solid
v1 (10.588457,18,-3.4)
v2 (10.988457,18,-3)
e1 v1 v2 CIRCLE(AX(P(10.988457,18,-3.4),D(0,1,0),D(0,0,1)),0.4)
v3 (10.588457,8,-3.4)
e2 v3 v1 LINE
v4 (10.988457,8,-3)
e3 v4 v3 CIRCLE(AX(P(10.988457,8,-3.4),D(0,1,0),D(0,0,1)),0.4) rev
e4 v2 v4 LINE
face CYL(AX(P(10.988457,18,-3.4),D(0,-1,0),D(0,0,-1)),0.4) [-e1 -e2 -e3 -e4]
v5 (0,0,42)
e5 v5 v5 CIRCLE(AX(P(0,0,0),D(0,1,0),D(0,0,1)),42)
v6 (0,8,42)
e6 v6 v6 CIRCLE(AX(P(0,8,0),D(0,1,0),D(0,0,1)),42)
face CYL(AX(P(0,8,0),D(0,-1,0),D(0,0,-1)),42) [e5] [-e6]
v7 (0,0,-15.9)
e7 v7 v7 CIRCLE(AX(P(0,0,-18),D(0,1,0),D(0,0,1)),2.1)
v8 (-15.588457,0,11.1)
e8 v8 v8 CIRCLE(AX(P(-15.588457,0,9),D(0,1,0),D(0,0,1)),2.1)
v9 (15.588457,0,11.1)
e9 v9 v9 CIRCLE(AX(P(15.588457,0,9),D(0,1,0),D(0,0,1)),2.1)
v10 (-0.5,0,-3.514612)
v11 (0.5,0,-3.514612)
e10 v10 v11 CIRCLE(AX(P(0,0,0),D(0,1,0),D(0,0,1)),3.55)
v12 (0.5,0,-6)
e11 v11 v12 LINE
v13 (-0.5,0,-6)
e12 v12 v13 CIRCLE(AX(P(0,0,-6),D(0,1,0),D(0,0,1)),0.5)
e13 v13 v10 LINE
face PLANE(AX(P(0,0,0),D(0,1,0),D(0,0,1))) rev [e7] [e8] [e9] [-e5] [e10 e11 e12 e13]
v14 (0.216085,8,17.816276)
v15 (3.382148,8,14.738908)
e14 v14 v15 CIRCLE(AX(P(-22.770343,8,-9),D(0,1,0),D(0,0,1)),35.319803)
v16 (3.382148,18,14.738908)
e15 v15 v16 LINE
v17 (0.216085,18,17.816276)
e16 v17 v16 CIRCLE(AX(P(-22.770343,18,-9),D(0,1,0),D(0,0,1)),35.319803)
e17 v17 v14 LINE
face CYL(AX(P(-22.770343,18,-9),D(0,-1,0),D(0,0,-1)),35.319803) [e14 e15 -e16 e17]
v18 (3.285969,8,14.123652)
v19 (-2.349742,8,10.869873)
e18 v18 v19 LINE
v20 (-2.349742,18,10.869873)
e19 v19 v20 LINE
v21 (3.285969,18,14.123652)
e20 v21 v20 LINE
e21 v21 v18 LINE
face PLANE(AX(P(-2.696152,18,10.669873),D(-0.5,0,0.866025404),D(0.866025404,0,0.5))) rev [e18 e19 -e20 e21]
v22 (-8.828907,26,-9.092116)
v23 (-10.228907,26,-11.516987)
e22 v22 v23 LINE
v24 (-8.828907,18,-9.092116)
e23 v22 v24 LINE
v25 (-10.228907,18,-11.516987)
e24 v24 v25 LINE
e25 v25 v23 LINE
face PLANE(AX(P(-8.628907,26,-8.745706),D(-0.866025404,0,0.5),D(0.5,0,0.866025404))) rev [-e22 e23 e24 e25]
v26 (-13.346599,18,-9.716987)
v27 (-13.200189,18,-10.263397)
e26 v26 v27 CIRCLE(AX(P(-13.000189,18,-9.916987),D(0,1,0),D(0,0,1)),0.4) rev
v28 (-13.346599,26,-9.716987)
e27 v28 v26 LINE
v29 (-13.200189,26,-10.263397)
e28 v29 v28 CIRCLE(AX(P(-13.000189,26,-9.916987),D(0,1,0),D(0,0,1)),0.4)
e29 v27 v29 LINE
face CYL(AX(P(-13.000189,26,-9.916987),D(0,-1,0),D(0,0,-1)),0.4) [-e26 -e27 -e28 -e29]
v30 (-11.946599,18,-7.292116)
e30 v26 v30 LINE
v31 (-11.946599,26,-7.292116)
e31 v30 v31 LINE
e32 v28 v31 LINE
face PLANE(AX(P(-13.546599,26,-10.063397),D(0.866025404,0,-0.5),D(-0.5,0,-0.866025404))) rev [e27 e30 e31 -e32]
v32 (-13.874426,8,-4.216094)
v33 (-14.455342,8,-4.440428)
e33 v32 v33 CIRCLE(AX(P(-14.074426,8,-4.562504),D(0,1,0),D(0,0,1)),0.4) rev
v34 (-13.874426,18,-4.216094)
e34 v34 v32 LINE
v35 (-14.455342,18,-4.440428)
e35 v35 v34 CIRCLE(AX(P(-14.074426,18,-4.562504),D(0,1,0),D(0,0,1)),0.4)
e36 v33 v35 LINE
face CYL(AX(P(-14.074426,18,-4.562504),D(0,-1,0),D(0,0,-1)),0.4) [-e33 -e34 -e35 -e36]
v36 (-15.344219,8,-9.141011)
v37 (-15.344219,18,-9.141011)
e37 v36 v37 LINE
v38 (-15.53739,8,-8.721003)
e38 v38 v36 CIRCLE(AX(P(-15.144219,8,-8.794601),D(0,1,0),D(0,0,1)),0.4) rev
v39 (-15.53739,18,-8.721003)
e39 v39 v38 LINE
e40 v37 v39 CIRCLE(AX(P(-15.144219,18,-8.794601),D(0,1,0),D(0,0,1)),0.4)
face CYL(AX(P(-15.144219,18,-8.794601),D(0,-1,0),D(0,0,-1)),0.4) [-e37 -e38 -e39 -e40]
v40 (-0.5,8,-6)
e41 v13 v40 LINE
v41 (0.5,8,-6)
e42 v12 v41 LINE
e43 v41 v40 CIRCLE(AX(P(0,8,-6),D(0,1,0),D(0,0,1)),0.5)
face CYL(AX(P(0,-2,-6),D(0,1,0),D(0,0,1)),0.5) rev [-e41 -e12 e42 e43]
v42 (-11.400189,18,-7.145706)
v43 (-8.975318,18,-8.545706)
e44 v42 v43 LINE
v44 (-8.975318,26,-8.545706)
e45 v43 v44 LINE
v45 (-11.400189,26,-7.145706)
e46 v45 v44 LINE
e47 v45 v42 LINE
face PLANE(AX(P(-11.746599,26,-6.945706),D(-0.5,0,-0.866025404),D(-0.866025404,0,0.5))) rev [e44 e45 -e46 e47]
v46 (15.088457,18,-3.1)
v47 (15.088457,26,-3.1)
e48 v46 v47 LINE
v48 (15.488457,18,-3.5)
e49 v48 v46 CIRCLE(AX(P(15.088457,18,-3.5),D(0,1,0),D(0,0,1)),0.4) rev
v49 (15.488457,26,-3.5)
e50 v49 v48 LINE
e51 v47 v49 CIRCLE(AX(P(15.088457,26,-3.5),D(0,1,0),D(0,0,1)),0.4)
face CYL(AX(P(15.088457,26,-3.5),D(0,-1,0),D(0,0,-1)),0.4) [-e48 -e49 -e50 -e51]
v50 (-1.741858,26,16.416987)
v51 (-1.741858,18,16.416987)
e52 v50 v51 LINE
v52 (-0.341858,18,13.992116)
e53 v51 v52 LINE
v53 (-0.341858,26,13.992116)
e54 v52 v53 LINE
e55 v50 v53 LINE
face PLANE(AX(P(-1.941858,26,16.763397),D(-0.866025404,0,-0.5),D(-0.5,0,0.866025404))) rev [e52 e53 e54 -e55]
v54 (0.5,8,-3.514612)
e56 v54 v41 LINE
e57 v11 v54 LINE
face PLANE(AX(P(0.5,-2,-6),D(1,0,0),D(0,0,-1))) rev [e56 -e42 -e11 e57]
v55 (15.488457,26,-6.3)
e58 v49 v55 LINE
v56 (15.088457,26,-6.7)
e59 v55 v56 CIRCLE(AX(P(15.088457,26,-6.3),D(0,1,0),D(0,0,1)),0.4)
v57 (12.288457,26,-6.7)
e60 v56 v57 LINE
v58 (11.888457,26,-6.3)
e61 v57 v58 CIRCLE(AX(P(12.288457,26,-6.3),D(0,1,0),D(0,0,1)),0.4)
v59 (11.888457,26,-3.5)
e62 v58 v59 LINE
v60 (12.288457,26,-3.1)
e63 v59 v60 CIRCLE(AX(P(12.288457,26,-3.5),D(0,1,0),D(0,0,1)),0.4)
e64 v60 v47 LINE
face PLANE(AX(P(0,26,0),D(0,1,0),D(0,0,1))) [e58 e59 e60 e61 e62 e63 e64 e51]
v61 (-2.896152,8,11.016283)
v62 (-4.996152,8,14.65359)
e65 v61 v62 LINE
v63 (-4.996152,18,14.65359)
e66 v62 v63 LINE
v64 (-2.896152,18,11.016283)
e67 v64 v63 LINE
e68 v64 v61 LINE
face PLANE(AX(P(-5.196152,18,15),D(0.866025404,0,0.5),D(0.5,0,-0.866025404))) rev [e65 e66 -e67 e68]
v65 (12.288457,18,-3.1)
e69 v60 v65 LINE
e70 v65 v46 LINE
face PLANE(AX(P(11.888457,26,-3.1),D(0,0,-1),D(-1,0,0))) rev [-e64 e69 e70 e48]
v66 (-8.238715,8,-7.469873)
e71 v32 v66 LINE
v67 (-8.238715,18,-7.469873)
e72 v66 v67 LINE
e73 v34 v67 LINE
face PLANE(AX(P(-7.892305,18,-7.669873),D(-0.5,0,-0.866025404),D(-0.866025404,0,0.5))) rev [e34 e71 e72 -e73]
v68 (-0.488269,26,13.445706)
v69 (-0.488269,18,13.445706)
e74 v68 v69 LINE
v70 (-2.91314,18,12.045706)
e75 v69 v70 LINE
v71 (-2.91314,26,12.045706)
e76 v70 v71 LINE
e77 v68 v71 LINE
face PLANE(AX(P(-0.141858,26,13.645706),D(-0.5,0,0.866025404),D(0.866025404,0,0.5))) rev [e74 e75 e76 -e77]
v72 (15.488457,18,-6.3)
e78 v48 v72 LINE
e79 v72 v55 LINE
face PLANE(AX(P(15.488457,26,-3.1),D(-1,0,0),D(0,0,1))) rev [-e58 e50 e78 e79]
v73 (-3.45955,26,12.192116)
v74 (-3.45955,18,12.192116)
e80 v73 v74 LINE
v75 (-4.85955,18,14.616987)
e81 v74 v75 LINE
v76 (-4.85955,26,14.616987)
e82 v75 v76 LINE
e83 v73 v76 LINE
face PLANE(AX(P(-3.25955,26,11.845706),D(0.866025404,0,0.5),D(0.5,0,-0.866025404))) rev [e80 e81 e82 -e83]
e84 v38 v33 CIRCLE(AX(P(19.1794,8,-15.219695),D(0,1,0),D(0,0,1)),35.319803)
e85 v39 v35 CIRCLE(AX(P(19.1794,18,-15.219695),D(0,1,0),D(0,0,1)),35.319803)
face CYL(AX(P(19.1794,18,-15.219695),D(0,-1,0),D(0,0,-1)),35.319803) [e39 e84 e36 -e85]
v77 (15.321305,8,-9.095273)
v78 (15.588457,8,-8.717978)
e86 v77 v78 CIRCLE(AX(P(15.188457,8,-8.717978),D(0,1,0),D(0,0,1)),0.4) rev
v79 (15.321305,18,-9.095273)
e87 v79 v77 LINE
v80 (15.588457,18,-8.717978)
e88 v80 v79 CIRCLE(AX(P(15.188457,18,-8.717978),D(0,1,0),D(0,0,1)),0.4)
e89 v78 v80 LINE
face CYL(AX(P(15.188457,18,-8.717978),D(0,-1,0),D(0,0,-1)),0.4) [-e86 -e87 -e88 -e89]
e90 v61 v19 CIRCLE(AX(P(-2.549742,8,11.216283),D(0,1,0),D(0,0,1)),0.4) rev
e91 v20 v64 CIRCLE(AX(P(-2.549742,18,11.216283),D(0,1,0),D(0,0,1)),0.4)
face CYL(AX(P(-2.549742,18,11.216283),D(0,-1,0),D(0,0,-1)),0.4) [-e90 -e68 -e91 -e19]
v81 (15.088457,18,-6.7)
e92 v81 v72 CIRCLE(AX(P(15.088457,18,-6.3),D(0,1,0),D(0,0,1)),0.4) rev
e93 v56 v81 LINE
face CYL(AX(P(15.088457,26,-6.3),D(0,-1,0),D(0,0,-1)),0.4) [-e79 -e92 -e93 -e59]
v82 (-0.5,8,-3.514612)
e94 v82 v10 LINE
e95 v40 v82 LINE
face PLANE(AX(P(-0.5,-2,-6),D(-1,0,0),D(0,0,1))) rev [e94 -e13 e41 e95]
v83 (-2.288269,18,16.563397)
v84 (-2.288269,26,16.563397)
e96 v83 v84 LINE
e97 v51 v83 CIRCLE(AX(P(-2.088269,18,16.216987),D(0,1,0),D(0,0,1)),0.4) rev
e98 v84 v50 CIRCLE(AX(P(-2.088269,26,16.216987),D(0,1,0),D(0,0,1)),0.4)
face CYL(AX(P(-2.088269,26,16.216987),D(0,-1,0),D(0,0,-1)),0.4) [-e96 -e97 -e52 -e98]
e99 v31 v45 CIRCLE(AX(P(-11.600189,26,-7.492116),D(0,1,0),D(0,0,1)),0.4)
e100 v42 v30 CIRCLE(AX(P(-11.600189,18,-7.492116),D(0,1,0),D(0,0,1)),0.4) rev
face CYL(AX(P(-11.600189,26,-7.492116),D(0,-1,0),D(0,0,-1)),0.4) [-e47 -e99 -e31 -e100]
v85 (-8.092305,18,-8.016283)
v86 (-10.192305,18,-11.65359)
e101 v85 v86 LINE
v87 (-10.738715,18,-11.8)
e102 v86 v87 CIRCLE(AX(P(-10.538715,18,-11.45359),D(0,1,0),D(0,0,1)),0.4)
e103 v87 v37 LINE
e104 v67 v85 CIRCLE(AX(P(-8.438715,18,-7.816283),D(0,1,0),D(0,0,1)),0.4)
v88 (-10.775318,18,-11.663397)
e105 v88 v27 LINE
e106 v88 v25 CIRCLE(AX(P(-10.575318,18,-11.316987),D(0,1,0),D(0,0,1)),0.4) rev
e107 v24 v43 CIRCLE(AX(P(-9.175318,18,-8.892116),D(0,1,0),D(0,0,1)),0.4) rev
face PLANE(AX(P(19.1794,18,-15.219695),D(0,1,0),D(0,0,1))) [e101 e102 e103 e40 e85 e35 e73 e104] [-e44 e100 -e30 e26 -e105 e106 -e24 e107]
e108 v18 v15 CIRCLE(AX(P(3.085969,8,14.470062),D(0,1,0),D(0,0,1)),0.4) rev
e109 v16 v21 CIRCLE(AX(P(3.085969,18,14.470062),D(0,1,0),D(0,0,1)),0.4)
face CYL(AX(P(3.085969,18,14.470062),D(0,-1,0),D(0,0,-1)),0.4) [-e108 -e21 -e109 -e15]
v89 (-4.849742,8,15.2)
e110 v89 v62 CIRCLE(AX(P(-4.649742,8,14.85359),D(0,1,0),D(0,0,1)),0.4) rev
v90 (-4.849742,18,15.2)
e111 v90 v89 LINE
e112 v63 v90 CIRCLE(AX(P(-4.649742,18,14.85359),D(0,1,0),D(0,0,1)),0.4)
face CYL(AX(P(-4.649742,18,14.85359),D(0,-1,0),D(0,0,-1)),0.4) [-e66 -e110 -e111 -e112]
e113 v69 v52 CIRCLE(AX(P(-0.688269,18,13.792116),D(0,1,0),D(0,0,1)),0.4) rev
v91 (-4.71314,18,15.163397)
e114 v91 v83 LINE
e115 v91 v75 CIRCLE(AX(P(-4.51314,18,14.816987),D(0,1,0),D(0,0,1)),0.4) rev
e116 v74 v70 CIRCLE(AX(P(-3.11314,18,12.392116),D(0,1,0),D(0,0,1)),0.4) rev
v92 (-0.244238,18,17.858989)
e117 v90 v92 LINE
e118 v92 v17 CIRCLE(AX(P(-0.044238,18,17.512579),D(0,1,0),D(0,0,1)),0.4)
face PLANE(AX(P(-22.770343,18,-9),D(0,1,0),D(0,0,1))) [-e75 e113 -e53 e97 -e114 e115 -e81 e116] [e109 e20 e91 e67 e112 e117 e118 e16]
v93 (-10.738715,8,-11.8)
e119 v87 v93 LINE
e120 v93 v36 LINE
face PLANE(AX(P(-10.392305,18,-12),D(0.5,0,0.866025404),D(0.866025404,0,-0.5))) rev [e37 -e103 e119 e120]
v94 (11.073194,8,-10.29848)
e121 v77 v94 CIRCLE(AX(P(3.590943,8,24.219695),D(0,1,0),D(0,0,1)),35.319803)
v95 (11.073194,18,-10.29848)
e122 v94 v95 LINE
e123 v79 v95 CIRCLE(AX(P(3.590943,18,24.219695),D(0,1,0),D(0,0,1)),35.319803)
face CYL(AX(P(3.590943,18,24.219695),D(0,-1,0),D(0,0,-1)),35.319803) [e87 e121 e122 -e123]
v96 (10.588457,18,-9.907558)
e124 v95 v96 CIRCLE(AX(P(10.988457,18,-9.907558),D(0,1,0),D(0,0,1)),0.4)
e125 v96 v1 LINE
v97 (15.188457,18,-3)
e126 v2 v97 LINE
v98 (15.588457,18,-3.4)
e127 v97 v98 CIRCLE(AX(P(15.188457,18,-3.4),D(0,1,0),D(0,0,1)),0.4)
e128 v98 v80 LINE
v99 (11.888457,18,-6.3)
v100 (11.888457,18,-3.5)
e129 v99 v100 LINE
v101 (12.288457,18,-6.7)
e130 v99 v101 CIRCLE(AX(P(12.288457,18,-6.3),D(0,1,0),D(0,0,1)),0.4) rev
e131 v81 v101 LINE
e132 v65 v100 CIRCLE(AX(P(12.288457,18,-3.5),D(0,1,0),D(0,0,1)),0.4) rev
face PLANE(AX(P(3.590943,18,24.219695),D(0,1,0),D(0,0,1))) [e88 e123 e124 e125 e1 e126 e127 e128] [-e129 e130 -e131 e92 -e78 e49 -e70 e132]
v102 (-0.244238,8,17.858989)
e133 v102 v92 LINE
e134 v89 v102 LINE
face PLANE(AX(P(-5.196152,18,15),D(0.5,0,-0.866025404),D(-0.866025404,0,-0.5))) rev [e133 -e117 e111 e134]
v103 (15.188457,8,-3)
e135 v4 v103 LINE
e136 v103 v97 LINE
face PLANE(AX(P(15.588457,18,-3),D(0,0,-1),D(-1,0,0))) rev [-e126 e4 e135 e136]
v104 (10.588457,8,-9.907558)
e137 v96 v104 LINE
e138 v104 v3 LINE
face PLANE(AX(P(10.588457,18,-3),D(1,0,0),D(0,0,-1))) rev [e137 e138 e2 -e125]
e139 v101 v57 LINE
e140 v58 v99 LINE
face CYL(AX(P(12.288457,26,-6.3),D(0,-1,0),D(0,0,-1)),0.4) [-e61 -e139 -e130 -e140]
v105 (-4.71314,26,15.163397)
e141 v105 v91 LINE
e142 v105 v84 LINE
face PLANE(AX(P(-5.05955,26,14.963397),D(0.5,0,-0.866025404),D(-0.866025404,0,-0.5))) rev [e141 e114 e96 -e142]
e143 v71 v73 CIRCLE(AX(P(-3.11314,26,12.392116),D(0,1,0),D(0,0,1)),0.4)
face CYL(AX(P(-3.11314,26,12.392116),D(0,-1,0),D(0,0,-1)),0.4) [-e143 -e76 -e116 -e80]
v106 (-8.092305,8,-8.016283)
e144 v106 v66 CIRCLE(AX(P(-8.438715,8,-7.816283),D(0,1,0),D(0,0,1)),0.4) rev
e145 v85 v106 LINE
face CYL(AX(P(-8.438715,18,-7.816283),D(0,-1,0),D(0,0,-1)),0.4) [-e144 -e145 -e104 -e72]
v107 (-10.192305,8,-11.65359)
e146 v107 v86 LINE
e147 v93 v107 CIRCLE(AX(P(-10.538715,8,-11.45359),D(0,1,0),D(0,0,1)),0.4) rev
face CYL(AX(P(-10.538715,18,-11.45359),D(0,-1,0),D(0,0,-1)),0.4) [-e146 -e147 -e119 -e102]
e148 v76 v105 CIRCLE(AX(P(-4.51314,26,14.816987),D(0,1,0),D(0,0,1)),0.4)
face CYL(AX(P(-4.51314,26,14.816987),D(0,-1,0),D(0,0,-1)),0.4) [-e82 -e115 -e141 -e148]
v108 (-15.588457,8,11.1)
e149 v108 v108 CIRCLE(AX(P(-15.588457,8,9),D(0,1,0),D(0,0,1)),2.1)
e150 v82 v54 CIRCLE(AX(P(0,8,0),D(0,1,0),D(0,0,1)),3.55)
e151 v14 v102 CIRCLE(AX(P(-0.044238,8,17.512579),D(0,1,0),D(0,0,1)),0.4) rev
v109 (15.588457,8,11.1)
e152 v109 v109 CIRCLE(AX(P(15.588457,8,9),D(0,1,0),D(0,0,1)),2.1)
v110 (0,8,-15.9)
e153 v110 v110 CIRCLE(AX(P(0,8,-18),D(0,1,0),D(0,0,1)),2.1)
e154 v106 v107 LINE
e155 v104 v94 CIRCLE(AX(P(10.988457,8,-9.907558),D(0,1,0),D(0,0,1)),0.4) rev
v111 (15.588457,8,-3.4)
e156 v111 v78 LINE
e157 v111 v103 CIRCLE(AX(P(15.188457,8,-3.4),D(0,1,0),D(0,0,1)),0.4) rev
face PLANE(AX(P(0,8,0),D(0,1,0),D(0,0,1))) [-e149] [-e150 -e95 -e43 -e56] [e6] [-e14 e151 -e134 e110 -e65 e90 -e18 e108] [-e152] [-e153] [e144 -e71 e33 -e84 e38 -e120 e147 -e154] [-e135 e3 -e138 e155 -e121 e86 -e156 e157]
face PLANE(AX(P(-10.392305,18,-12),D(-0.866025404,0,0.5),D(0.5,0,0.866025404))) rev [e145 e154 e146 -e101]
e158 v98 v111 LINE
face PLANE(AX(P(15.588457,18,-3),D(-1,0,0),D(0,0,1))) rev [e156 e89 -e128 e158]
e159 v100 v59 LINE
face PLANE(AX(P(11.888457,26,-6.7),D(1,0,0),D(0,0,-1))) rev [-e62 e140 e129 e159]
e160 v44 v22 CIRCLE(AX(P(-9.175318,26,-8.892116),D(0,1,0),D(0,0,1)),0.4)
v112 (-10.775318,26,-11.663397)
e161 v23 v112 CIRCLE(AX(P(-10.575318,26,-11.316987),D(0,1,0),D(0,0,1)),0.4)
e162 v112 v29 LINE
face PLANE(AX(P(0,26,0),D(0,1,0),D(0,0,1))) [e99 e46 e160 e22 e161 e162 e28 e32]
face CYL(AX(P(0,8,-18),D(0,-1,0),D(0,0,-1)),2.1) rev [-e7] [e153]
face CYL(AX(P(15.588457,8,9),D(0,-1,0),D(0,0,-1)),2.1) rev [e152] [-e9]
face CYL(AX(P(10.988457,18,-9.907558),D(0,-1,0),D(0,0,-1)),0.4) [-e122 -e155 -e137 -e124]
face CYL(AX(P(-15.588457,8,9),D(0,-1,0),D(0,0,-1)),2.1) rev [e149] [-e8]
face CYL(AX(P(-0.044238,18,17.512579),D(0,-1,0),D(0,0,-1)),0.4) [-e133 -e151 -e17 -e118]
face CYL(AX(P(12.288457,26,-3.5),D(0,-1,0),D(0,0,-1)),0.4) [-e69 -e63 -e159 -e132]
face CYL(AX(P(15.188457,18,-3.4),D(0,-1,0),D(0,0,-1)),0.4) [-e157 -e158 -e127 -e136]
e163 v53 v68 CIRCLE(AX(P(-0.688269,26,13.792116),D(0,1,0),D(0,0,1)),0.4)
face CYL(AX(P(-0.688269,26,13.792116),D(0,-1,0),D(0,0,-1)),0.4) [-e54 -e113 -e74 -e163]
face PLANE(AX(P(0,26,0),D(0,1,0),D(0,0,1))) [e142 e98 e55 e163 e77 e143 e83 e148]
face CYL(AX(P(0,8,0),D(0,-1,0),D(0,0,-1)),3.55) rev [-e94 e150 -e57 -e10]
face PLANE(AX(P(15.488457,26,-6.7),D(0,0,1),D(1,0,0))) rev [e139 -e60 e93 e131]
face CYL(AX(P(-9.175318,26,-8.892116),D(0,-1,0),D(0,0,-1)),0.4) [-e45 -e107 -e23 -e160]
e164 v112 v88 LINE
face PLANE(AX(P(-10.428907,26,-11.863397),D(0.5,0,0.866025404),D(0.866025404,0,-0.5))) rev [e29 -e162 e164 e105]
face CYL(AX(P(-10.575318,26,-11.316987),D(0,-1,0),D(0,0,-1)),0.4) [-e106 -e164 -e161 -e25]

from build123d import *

# Parameters (mm, degrees)
BOSS_EXTRUDE1_OUTLINE_R   = 42
BOSS_EXTRUDE1_OUTLINE_R_2 = 2.1
BOSS_EXTRUDE1_OUTLINE_R_3 = 3.55
BOSS_EXTRUDE1_DEPTH       = 8
CUT_EXTRUDE2_DEPTH        = 10
BOSS_EXTRUDE5_DEPTH       = 10
SKETCH9_W                 = 3.6
SKETCH9_H                 = 3.6
BOSS_EXTRUDE6_DEPTH       = 8
FILLET1_R                 = 0.4


# Read off the part's stored shape, not the designer's step: Boss-Extrude1
with BuildPart() as part:
    # Boss-Extrude1 outline → Boss-Extrude1 (new body)
    with BuildSketch(Plane(origin=(0, 0, 0), x_dir=(1, 0, 0), z_dir=(0, 1, 0))):
        Circle(BOSS_EXTRUDE1_OUTLINE_R)
        with Locations((-15.588457268, -9)):
            Circle(BOSS_EXTRUDE1_OUTLINE_R_2, mode=Mode.SUBTRACT)
        with Locations((15.588457268, -9)):
            Circle(BOSS_EXTRUDE1_OUTLINE_R_2, mode=Mode.SUBTRACT)
        Circle(BOSS_EXTRUDE1_OUTLINE_R_3, mode=Mode.SUBTRACT)
        with Locations((0, 18)):
            Circle(BOSS_EXTRUDE1_OUTLINE_R_2, mode=Mode.SUBTRACT)
    extrude(amount=BOSS_EXTRUDE1_DEPTH)

    # Sketch3 → Cut-Extrude2 (cut)
    with BuildSketch(Plane(origin=(0, 8, 0), x_dir=(1, 0, 0), z_dir=(0, 1, 0))):
        with BuildLine():
            Line((0.5, 6), (0.5, 0))
            ThreePointArc((0.5, 0), (0, -0.5), (-0.5, 0))
            Line((-0.5, 0), (-0.5, 6))
            ThreePointArc((-0.5, 6), (0, 6.5), (0.5, 6))
        make_face()
    extrude(amount=-CUT_EXTRUDE2_DEPTH, mode=Mode.SUBTRACT)

    # Sketch7 → Boss-Extrude5 (add)
    with BuildSketch(Plane(origin=(0, 8, 0), x_dir=(1, 0, 0), z_dir=(0, 1, 0))):
        with BuildLine():
            Line((-5.196152423, -15), (0, -18))
            ThreePointArc((0, -18), (1.923015451, -16.253248712), (3.712435565, -14.369872981))
            Line((3.712435565, -14.369872981), (-2.696152423, -10.669872981))
            Line((-2.696152423, -10.669872981), (-5.196152423, -15))
        make_face()
        with BuildLine():
            Line((-10.392304845, 12), (-15.588457268, 9))
            ThreePointArc((-15.588457268, 9), (-15.037234004, 6.461244123), (-14.300892833, 3.969872981))
            Line((-14.300892833, 3.969872981), (-7.892304845, 7.669872981))
            Line((-7.892304845, 7.669872981), (-10.392304845, 12))
        make_face()
        with BuildLine():
            Line((15.588457268, 3), (15.588457268, 9))
            ThreePointArc((15.588457268, 9), (13.114218553, 9.792004588), (10.588457268, 10.4))
            Line((10.588457268, 10.4), (10.588457268, 3))
            Line((10.588457268, 3), (15.588457268, 3))
        make_face()
    extrude(amount=BOSS_EXTRUDE5_DEPTH)

    # Sketch9 → Boss-Extrude6 (add)
    with BuildSketch(Plane(origin=(0, 18, 0), x_dir=(1, 0, 0), z_dir=(0, 1, 0))):
        with Locations((13.688457268, 4.9)):
            Rectangle(SKETCH9_W, SKETCH9_H)
        Polygon((-0.141858429, -13.645706006), (-3.259549882, -11.845706006), (-5.059549882, -14.96339746), (-1.941858429, -16.76339746), align=None)
        Polygon((-11.746598839, 6.945706006), (-8.628907386, 8.745706006), (-10.428907386, 11.86339746), (-13.546598839, 10.06339746), align=None)
    extrude(amount=BOSS_EXTRUDE6_DEPTH)

    # Fillet1
    fillet1_edges = [part.edges().sort_by_distance(p)[0] for p in [
        (-13.546598839, 22, -10.06339746),
        (-11.746598839, 22, -6.945706006),
        (-8.628907386, 22, -8.745706006),
        (-10.428907386, 22, -11.86339746),
        (-7.892304845, 13, -7.669872981),
        (-10.392304845, 13, -12),
        (-15.588457268, 13, -9),
        (-14.300892833, 13, -3.969872981),
        (-2.696152423, 13, 10.669872981),
        (-5.196152423, 13, 15),
        (0, 13, 18),
        (3.712435565, 13, 14.369872981),
        (10.588457268, 13, -3),
        (15.588457268, 13, -3),
        (15.588457268, 13, -9),
        (10.588457268, 13, -10.4),
        (15.488457268, 22, -6.7),
        (11.888457268, 22, -6.7),
        (11.888457268, 22, -3.1),
        (15.488457268, 22, -3.1),
        (-1.941858429, 22, 16.76339746),
        (-0.141858429, 22, 13.645706006),
        (-3.259549882, 22, 11.845706006),
        (-5.059549882, 22, 14.96339746),
    ]]
    fillet(fillet1_edges, radius=FILLET1_R)


solid = part.part
